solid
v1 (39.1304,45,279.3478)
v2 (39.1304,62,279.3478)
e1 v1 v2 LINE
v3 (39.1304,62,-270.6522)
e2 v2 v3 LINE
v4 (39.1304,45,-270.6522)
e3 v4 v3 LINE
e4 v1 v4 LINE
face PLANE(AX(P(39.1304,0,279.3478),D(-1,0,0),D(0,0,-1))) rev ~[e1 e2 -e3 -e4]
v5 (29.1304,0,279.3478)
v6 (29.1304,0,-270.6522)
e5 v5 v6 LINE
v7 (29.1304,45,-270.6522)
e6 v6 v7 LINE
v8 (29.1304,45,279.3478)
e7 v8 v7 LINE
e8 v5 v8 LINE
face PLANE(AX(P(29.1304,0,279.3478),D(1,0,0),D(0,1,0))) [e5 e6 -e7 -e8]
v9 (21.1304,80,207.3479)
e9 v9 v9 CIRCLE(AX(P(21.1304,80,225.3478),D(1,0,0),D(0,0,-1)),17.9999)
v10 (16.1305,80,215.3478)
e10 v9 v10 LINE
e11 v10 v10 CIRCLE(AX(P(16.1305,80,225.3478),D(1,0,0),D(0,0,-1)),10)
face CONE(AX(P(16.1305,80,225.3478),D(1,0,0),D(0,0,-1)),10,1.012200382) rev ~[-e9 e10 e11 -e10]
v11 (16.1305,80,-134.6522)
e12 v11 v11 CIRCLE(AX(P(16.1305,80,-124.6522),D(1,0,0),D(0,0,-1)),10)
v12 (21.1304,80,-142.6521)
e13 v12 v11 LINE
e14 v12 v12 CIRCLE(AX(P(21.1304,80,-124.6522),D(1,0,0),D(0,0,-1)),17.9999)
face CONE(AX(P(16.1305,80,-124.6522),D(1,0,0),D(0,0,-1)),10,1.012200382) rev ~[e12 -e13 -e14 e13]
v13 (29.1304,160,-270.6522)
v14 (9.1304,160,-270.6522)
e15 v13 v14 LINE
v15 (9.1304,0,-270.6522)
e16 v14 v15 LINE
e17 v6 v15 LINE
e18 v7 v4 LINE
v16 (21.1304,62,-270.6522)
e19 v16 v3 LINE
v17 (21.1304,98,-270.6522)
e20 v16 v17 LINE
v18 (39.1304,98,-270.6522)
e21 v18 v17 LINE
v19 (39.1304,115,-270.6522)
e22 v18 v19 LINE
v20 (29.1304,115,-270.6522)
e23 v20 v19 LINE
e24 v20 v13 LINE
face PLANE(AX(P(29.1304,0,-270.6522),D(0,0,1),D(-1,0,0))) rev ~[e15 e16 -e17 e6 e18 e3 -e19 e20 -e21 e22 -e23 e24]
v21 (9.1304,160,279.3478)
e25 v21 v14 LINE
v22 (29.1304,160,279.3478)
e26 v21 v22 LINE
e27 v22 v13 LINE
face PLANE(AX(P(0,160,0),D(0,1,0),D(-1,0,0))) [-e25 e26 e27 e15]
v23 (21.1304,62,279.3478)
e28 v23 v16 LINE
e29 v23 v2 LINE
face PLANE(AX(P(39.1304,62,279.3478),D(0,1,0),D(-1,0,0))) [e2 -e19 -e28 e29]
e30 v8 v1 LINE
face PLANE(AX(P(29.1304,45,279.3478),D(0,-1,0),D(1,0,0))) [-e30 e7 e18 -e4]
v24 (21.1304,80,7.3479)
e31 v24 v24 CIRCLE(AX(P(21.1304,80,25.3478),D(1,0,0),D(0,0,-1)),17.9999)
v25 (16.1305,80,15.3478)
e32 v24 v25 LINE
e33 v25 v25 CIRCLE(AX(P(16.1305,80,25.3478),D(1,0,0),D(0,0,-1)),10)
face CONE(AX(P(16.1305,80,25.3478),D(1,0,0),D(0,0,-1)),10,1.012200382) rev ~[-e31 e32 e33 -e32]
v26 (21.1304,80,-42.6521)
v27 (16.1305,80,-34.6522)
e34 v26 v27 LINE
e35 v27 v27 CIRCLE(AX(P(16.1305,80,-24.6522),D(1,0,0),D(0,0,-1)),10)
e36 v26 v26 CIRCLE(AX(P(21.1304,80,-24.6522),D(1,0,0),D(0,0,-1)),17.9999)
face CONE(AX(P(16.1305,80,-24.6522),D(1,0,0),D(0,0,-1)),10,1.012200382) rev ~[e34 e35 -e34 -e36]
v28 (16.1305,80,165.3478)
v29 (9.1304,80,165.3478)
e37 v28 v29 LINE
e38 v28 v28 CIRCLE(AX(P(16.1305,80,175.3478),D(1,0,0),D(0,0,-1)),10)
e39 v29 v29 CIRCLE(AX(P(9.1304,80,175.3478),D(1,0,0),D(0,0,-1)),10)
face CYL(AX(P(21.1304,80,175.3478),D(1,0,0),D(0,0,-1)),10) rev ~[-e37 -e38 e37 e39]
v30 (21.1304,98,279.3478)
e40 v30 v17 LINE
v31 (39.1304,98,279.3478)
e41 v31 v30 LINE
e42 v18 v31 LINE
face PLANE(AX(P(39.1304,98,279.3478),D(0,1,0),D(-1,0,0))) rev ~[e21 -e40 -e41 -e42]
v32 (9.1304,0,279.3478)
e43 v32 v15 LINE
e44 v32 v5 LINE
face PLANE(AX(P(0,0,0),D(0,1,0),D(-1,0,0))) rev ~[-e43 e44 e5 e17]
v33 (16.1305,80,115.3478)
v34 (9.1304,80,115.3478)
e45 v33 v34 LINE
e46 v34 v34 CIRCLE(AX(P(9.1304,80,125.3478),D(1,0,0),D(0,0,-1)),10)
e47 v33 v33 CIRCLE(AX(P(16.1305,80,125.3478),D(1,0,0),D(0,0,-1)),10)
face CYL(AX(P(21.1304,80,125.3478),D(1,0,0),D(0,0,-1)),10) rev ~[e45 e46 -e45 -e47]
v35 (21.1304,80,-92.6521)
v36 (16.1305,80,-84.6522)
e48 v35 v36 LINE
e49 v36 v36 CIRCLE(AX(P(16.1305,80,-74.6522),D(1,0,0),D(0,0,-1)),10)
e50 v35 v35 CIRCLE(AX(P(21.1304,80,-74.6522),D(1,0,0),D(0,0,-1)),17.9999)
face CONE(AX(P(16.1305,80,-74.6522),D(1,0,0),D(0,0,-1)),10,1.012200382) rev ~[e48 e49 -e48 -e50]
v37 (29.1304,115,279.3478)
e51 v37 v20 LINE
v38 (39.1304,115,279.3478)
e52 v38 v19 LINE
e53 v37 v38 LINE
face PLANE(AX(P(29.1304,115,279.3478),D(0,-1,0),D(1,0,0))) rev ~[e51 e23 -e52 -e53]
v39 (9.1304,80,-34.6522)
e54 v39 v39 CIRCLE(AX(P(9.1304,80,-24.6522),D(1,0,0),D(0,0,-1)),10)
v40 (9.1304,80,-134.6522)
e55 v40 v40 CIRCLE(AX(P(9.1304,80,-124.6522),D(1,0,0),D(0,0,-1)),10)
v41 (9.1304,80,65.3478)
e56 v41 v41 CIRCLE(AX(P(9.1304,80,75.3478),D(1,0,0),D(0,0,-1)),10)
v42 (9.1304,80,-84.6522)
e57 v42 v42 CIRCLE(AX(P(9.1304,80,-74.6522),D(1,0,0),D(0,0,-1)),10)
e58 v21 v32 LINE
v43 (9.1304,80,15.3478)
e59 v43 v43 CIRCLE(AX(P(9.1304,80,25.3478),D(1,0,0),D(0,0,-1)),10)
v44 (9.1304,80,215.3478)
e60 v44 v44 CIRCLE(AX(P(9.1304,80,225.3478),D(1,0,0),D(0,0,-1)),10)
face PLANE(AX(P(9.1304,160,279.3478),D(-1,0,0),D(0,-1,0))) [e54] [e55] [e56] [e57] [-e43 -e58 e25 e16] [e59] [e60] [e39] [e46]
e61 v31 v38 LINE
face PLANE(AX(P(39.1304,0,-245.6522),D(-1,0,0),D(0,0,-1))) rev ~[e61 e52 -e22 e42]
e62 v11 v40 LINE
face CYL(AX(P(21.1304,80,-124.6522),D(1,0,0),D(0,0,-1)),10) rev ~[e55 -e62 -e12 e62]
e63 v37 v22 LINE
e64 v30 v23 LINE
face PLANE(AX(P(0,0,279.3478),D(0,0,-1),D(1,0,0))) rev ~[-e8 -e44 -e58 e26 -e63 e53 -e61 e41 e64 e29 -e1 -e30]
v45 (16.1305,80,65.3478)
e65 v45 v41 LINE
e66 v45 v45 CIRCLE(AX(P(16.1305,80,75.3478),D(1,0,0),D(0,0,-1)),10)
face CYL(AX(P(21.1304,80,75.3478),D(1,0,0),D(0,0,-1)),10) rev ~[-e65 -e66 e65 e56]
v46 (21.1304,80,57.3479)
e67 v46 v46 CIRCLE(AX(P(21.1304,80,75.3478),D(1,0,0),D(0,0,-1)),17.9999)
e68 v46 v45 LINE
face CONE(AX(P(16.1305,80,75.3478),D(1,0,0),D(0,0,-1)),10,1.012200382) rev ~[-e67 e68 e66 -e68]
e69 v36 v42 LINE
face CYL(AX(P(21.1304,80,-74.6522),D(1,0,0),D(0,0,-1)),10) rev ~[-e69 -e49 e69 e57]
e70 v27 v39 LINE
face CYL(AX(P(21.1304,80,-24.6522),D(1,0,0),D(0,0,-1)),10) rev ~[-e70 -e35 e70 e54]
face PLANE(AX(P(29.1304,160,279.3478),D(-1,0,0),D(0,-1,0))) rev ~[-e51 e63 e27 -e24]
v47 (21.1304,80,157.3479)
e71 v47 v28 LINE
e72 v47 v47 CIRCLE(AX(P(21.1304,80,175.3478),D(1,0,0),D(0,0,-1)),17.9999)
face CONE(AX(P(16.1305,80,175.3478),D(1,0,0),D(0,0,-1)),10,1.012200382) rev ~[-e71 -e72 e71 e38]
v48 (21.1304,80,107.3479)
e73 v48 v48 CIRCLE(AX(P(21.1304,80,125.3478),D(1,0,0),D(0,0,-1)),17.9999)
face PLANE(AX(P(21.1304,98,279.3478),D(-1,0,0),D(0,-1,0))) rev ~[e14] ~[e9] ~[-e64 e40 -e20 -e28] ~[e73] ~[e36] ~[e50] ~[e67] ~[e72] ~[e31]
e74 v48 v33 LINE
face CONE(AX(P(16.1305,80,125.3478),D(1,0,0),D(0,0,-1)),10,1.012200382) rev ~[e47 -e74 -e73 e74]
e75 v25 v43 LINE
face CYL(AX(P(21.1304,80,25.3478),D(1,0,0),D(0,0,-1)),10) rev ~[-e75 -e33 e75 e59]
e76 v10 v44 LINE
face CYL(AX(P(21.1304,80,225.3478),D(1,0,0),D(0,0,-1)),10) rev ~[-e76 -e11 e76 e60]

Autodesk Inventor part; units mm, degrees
ref_plane "YZ Plane" through (0, 0, 0) normal (1, 0, 0) x (0, 1, 0)
ref_plane "XZ Plane" through (0, 0, 0) normal (0, 1, 0) x (-1, 0, 0)
ref_plane "XY Plane" through (0, 0, 0) normal (0, 0, 1) x (1, 0, 0)
sketch "Sketch1" plane through (0, 0, 0) normal (0, 1, 0) x (-1, 0, 0)
  line L0 (0, 279.3478) -> (-39.1304, 279.3478)
  line L1 (-39.1304, 279.3478) -> (-39.1304, -270.6522)
  line L2 (-39.1304, -270.6522) -> (0, -270.6522)
  line L3 (0, -270.6522) -> (0, 279.3478)
  line L4 (-39.1304, 279.3478) -> (-29.1304, 279.3478)
  line L5 (-29.1304, 254.3478) -> (-39.1304, 254.3478)
  line L6 (-39.1304, 254.3478) -> (-39.1304, 279.3478)
  line L7 (-39.1304, -270.6522) -> (-29.1304, -270.6522)
  line L8 (-29.1304, -245.6522) -> (-39.1304, -245.6522)
  line L9 (-39.1304, -245.6522) -> (-39.1304, -270.6522)
  point P0 (0, 0)
  point P1 (-39.1304, 254.3478)
  point P2 (-39.1304, -245.6522)
  dimension "d0" = 550
  dimension "d4" = 25
  dimension "d5" = 25
  dimension "d28" = 39.1304
extrude "Extrusion1" add sketch "Sketch1" along normal blind 160
sketch "Sketch2" plane through (0, 0, 279.3478) normal (0, 0, 1) x (1, 0, 0)
  line L0 (0, 160) -> (39.1304, 160) projected
  line L1 (0, 160) -> (39.1304, 160)
  line L2 (39.1304, 160) -> (39.1304, 0)
  line L3 (39.1304, 0) -> (0, 0)
  line L4 (0, 0) -> (0, 160)
  line L5 (39.1304, 160) -> (29.1304, 160)
  line L6 (29.1304, 160) -> (29.1304, 115)
  line L7 (29.1304, 115) -> (39.1304, 115)
  line L8 (39.1304, 115) -> (39.1304, 160)
  line L9 (39.1304, 0) -> (29.1304, 0)
  line L10 (29.1304, 0) -> (29.1304, 45)
  line L11 (29.1304, 45) -> (39.1304, 45)
  line L12 (39.1304, 45) -> (39.1304, 0)
  circle A0 centre (39.1304, 80) radius 18
  line L13 (21.1304, 75) -> (39.1304, 75)
  line L14 (39.1304, 75) -> (39.1304, 98)
  line L15 (39.1304, 98) -> (21.1304, 98)
  line L16 (21.1304, 98) -> (21.1304, 75)
  line L17 (21.1304, 75) -> (39.1304, 75)
  line L18 (39.1304, 75) -> (39.1304, 62)
  line L19 (39.1304, 62) -> (21.1304, 62)
  line L20 (21.1304, 62) -> (21.1304, 75)
  line L21 (39.1304, 0) -> (39.1304, 160) projected
  line L22 (0, 160) -> (9.1304, 160)
  line L23 (9.1304, 160) -> (9.1304, 0)
  line L24 (9.1304, 0) -> (0, 0)
  line L25 (0, 0) -> (0, 160)
  point P0 (0, 0)
  point P1 (34.1304, 115)
  point P2 (34.1304, 160)
  point P3 (39.1304, 45)
  point P4 (39.1304, 115)
  dimension "d6" = 10
  dimension "d7" = 45
  dimension "d8" = 45
  dimension "d9" = 18
  dimension "d10" = 36
  dimension "d11" = 80
  dimension "d12" = 80
  dimension "d15" = 30
extrude "Extrusion2" cut sketch "Sketch2" against normal up to surface (550 mm away) contours L0 L23 L3 L4 | L0 L2 L7 L6 | L10 L11 L2 L3 | L2 L13 A0 | A0 L16 L15 | L2 A0 L13 | A0 L13 L16 | L19 L20 L13 A0
sketch "Sketch3" plane through (21.1304, 62, 279.3478) normal (1, 0, 0) x (0, 0, -1)
  line L0 (550, 0) -> (0, 0) projected
  line L1 (0, 0) -> (0, 36) projected
  line L2 (0, 36) -> (550, 36) projected
  circle A0 centre (54, 18) radius 10
  circle A1 centre (104, 18) radius 10
  circle A2 centre (154, 18) radius 10
  circle A3 centre (204, 18) radius 10
  circle A4 centre (254, 18) radius 10
  circle A5 centre (304, 18) radius 10
  circle A6 centre (354, 18) radius 10
  circle A7 centre (404, 18) radius 10
  circle A8 centre (454, 18) radius 10
  point P0 (279.3478, -62)
  dimension "d18" = 50
extrude "Extrusion3" cut sketch "Sketch3" against normal blind 25 contours A0 | A1 | A2 | A3 | A4 | A5 | A6 | A7
chamfer "Chamfer1" distance 8 distance2 5 8 edges at (21.1304, 80, 235.3478) (21.1304, 80, 185.3478) (21.1304, 80, 135.3478) (21.1304, 80, 85.3478) (21.1304, 80, 35.3478) (21.1304, 80, -14.6522) (21.1304, 80, -64.6522) (21.1304, 80, -114.6522) measured on face at (21.1304, 80, -225.3188)
properties part number "MainRails" material "Aluminum 6061"
